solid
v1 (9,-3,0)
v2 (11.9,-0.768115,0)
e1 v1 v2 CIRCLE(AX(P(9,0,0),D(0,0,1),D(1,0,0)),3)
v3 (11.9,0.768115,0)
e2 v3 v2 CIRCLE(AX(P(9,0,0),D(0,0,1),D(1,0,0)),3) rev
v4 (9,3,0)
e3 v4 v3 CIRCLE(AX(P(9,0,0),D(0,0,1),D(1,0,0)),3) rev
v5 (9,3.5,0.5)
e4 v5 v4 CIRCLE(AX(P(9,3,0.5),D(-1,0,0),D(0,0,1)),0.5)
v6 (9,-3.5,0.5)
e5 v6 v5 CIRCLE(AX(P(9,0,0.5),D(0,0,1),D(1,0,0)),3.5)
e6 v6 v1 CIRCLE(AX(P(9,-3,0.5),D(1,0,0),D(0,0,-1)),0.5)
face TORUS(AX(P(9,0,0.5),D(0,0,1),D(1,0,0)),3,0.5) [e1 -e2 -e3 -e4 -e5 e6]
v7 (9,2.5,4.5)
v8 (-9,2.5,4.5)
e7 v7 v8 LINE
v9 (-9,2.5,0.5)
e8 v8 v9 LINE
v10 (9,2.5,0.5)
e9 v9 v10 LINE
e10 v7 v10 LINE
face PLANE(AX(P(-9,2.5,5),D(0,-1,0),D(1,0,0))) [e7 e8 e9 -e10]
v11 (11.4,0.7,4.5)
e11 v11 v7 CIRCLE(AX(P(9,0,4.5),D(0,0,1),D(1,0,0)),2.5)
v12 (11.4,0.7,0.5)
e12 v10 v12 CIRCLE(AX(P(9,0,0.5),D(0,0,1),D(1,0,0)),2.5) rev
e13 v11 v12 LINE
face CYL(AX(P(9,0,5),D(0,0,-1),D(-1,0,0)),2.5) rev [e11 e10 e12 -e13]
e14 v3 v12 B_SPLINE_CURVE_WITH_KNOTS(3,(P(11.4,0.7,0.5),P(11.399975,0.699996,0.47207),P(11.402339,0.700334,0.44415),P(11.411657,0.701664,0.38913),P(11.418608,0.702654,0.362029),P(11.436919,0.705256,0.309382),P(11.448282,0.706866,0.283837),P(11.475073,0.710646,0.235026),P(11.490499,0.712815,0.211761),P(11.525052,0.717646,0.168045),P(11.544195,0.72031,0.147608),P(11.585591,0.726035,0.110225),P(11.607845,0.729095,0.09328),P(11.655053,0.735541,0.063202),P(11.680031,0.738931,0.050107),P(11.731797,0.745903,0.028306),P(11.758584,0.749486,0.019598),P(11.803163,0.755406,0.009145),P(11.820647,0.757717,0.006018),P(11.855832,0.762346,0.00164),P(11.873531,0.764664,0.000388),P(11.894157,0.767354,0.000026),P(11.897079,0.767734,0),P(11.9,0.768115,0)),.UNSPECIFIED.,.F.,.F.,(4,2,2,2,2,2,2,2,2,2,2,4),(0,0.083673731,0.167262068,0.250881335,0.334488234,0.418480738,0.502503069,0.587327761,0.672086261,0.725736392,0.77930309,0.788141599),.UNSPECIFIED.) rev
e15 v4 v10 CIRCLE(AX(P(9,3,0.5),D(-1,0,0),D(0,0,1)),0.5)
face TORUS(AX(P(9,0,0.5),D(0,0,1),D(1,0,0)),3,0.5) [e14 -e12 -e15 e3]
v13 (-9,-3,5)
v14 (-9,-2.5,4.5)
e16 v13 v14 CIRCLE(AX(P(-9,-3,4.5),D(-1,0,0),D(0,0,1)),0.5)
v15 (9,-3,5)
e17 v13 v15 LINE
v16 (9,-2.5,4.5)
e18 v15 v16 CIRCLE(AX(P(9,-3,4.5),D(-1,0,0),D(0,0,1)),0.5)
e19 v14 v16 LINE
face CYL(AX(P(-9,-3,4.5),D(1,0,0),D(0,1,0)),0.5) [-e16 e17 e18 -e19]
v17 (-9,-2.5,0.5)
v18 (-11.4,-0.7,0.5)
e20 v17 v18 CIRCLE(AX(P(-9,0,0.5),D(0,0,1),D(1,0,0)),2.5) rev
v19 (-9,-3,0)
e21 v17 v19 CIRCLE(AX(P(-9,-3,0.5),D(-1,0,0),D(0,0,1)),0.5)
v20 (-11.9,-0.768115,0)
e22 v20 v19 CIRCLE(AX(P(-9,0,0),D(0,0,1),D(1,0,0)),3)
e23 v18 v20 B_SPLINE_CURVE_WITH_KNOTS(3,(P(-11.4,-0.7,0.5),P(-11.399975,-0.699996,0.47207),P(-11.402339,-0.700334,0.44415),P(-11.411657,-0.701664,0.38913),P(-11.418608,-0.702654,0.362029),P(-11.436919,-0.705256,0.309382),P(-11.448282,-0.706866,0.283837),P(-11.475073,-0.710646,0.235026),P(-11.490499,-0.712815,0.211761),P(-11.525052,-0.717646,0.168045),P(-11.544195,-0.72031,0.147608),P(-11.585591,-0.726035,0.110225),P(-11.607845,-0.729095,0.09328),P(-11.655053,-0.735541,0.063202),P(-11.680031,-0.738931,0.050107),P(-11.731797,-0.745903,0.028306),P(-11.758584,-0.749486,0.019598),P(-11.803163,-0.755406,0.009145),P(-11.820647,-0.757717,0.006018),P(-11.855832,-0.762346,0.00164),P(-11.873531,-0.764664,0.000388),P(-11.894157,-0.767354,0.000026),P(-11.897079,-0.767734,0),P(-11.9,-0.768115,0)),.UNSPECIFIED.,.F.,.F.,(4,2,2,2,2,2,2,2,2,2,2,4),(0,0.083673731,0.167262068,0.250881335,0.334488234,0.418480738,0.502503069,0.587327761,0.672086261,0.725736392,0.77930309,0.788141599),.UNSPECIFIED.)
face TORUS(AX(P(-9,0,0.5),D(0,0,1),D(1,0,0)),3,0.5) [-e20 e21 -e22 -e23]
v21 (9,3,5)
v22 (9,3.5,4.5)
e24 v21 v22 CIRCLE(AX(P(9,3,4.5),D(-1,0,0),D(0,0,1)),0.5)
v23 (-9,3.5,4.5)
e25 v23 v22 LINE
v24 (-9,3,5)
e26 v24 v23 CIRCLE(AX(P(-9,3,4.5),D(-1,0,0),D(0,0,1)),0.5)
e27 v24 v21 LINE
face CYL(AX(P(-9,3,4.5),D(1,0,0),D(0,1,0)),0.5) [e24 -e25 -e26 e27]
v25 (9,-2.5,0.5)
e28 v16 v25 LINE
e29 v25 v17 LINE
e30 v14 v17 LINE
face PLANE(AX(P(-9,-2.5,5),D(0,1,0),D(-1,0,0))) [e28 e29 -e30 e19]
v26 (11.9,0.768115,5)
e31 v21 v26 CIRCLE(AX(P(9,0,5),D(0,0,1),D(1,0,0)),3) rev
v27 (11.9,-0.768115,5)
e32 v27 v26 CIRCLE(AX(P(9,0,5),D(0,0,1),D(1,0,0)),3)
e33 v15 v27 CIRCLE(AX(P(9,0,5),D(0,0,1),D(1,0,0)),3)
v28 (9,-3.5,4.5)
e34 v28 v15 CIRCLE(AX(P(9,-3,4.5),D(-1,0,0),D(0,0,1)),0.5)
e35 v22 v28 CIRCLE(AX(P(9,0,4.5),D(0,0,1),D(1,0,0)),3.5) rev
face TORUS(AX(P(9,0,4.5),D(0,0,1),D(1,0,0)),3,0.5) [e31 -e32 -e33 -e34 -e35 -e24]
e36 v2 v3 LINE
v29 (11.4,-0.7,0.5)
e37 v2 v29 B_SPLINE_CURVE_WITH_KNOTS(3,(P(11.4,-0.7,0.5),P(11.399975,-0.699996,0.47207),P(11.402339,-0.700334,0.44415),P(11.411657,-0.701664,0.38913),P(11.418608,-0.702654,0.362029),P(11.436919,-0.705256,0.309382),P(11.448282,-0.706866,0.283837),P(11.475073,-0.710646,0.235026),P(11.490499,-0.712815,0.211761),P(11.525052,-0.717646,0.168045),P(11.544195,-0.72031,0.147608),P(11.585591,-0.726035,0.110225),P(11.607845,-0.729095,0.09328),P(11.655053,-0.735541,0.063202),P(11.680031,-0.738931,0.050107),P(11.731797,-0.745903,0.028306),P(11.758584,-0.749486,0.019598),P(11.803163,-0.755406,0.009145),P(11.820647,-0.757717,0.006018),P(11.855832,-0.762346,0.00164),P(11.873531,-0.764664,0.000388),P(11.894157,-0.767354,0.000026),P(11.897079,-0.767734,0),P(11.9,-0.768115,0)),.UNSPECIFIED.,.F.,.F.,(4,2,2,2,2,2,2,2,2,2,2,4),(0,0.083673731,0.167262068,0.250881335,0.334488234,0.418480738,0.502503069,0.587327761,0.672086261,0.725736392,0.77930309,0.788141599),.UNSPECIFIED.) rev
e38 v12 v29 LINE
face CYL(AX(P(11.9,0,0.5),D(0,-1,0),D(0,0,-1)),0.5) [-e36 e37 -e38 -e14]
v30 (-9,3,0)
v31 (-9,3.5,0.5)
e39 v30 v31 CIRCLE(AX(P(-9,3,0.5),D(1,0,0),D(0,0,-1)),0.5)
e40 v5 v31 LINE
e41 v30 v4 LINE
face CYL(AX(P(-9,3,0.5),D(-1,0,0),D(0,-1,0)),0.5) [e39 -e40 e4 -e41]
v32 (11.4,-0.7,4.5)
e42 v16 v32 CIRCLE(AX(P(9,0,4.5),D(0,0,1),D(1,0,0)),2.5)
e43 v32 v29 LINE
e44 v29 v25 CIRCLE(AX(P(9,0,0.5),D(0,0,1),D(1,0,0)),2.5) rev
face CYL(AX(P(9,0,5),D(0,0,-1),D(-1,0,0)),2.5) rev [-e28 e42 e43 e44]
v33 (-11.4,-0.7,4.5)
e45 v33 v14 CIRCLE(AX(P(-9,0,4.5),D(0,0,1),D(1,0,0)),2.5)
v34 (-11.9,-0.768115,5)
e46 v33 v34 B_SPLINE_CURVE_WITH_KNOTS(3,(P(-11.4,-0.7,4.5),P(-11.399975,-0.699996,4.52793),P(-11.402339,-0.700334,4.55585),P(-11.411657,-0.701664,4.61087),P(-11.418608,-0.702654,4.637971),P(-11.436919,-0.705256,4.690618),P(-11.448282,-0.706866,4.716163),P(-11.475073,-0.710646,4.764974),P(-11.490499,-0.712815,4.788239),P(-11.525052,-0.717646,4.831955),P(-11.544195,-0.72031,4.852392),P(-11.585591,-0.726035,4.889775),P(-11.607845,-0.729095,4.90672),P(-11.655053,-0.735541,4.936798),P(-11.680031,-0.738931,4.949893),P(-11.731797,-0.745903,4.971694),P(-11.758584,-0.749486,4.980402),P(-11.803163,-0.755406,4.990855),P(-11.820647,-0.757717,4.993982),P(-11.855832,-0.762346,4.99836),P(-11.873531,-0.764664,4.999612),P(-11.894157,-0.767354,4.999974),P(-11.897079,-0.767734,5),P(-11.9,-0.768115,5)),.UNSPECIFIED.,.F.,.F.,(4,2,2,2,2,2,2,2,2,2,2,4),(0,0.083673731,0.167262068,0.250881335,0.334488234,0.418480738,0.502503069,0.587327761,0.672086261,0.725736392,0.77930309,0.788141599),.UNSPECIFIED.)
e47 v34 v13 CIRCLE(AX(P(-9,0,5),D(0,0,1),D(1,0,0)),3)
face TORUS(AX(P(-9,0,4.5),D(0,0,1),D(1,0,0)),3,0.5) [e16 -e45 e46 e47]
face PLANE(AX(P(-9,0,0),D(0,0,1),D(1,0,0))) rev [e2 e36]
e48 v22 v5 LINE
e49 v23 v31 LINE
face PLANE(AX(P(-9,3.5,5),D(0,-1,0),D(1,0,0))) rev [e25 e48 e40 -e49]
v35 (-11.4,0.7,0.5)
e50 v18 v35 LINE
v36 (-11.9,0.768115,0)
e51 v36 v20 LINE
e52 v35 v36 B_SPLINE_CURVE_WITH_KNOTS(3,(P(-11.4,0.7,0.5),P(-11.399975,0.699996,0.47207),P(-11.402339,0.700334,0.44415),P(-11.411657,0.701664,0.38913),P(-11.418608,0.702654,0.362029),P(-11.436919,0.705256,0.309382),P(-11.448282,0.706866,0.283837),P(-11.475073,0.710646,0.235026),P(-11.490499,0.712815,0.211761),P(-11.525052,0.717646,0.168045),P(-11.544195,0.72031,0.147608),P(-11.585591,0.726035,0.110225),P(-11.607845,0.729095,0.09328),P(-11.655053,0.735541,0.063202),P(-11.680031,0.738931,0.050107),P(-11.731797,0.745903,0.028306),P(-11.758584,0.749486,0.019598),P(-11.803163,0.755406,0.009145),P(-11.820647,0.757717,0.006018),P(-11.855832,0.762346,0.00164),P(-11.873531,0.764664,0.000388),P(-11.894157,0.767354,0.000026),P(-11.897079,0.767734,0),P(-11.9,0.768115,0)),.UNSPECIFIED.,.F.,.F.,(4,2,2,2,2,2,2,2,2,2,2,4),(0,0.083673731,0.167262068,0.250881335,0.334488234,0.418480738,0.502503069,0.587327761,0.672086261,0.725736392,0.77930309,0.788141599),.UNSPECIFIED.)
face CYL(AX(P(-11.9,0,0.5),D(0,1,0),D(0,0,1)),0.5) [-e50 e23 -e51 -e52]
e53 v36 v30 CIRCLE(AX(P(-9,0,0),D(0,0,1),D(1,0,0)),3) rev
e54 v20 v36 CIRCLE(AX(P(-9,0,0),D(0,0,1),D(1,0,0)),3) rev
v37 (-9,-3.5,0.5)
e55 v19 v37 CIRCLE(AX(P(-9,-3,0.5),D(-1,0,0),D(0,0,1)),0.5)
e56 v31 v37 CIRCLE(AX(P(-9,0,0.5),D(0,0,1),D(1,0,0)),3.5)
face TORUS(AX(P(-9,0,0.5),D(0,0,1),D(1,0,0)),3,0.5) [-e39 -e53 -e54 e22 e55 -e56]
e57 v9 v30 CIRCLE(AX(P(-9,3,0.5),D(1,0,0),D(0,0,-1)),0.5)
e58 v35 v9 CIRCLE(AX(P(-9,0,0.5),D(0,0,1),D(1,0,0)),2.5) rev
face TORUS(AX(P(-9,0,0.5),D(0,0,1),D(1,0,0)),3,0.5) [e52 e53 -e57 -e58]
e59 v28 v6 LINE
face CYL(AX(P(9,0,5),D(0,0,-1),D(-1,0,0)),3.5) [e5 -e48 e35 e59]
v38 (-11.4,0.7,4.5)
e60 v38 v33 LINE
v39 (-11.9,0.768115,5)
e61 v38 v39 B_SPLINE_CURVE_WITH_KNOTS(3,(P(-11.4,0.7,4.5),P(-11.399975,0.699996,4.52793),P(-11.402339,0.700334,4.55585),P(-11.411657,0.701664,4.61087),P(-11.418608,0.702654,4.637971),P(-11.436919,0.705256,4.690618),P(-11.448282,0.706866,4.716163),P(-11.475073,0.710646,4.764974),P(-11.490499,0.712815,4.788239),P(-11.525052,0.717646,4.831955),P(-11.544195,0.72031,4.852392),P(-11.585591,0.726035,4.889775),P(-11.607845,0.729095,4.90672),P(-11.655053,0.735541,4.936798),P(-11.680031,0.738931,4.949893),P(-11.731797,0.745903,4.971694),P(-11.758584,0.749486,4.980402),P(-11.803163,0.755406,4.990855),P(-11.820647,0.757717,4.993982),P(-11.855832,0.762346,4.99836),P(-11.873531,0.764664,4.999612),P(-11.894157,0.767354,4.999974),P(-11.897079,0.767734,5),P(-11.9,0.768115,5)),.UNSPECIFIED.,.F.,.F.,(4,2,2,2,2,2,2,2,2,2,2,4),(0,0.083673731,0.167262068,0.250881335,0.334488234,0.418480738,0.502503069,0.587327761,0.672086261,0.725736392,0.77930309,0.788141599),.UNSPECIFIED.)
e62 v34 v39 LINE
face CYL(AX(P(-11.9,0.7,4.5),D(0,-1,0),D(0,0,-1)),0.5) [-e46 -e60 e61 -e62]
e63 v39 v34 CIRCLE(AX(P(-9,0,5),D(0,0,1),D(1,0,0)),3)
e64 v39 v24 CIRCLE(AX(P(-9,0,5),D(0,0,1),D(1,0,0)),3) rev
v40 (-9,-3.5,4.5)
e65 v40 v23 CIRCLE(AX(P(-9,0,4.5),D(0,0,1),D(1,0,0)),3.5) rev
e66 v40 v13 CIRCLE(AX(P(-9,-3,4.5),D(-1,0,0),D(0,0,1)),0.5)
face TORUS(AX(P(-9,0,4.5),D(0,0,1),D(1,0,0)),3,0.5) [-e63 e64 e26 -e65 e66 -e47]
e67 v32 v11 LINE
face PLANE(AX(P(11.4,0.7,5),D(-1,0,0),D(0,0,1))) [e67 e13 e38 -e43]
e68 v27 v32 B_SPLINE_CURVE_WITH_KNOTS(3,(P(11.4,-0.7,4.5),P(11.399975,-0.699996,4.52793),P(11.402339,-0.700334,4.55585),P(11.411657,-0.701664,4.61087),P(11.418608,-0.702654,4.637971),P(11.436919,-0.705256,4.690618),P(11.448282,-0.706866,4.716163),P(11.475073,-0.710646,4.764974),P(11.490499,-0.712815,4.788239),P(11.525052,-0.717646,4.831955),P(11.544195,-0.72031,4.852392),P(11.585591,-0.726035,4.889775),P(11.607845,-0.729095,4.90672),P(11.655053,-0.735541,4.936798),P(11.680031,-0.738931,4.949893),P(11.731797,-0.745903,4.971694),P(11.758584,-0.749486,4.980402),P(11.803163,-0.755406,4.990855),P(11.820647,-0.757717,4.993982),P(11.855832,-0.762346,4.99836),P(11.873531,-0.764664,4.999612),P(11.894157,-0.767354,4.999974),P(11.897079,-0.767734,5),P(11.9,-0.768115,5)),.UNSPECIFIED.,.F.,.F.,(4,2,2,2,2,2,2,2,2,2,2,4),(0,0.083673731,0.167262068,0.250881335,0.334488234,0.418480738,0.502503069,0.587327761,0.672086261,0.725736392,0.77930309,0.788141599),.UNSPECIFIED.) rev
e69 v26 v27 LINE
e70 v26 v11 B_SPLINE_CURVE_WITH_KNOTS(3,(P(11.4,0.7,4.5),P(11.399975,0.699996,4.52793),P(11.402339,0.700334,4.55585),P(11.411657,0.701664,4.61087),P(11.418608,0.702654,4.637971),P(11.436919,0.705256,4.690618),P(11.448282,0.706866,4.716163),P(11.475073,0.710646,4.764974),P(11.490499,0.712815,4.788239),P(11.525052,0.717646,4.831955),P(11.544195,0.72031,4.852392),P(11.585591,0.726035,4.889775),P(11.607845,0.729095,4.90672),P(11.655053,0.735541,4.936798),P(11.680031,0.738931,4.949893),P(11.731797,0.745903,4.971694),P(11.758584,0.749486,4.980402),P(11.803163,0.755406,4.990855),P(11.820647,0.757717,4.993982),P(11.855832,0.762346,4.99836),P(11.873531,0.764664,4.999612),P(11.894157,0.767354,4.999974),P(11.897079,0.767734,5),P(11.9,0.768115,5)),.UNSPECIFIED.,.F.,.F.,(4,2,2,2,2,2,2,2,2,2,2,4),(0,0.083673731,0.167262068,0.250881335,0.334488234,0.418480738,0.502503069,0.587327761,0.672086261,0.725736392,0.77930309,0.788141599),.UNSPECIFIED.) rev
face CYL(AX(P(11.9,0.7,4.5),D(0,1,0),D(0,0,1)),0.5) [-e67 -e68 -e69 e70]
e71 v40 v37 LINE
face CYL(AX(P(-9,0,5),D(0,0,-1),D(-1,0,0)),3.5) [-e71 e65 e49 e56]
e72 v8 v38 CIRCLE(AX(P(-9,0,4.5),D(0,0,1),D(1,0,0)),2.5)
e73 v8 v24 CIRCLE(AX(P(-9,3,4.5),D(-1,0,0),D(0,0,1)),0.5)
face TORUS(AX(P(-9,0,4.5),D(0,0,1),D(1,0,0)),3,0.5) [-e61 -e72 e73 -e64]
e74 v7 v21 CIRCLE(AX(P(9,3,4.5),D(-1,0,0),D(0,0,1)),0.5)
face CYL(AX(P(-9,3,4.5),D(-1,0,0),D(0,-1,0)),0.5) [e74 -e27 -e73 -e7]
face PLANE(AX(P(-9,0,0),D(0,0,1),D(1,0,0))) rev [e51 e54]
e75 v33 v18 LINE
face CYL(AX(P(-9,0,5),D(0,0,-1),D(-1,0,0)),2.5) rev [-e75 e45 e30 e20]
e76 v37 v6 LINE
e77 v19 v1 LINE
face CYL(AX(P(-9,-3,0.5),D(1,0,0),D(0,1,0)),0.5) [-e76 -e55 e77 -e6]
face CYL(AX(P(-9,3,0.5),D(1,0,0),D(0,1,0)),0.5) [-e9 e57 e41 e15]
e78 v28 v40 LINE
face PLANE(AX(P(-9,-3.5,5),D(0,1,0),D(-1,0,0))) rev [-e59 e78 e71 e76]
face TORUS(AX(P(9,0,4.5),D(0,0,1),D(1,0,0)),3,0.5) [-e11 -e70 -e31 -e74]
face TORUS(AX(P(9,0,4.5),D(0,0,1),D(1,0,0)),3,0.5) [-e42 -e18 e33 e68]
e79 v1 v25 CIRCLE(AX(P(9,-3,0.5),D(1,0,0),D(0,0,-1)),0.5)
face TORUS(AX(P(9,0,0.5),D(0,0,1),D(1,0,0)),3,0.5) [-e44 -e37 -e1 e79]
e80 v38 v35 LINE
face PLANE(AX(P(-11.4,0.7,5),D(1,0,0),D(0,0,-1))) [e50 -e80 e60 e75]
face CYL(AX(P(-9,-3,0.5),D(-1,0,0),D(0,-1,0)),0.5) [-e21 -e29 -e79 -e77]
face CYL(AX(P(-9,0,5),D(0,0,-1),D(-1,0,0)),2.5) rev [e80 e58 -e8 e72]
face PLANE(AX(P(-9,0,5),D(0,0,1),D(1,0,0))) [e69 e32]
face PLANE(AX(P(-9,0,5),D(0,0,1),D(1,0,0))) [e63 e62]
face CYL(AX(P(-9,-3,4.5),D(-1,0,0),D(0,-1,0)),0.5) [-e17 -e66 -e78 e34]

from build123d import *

# Parameters (mm, degrees)
BOSS_EXTRUDE1_DEPTH = 5
FILLET1_R           = 0.5


with BuildPart() as part:
    # Sketch1 → Boss-Extrude1 (new body)
    with BuildSketch(Plane.XY):
        with BuildLine():
            Line((-9, 3.5), (9, 3.5))
            ThreePointArc((9, 3.5), (12.5, 0), (9, -3.5))
            Line((9, -3.5), (-9, -3.5))
            ThreePointArc((-9, -3.5), (-12.5, 0), (-9, 3.5))
        make_face()
        with BuildLine():
            Line((-9, 2.5), (9, 2.5))
            ThreePointArc((9, 2.5), (10.5, 2), (11.4, 0.7))
            Line((11.4, 0.7), (11.4, -0.7))
            ThreePointArc((11.4, -0.7), (10.5, -2), (9, -2.5))
            Line((9, -2.5), (-9, -2.5))
            ThreePointArc((-9, -2.5), (-10.5, -2), (-11.4, -0.7))
            Line((-11.4, -0.7), (-11.4, 0.7))
            ThreePointArc((-11.4, 0.7), (-10.5, 2), (-9, 2.5))
        make_face(mode=Mode.SUBTRACT)
    extrude(amount=BOSS_EXTRUDE1_DEPTH)

    # Fillet1
    # the kernel refuses this fillet: 0.5 mm, written as the material it takes off along each edge
    with BuildSketch(Plane(origin=(9, 0, 5), x_dir=(0, 1, 0), z_dir=(-1, 0, 0))) as fillet1_piece_1:
        with BuildLine():
            CenterArc((3.5 - FILLET1_R, FILLET1_R), FILLET1_R, 270, 90)
            Line((3.5 - FILLET1_R, 0), (3.5, 0))
            Line((3.5, 0), (3.5, FILLET1_R))
        make_face()
    revolve(axis=Axis((9, 0, 5), (0, 0, -1)), revolution_arc=180, mode=Mode.SUBTRACT)
    with BuildSketch(Plane(origin=(-9, 3.5, 5), x_dir=(0, 0, -1), z_dir=(1, 0, 0)), Plane(origin=(9, -2.5, 0), x_dir=(0, 0, 1), z_dir=(-1, 0, 0)), Plane(origin=(-9, 2.5, 0), x_dir=(0, 0, 1), z_dir=(1, 0, 0)), Plane(origin=(9, -3.5, 5), x_dir=(0, 0, -1), z_dir=(-1, 0, 0))) as fillet1_piece_2:
        with BuildLine():
            CenterArc((FILLET1_R, -FILLET1_R), FILLET1_R, 90, 90)
            Line((0, -FILLET1_R), (0, 0))
            Line((0, 0), (FILLET1_R, 0))
        make_face()
    extrude(amount=18, mode=Mode.SUBTRACT)
    with BuildSketch(Plane(origin=(-9, 0, 0), x_dir=(-0.9766894786978908, -0.21465708048150275, 0), z_dir=(0.21465708048150275, -0.9766894786978908, 0))) as fillet1_piece_3_section:
        with BuildLine():
            CenterArc((2.5 + FILLET1_R, -FILLET1_R), FILLET1_R, 90, 90)
            Line((2.5 + FILLET1_R, 0), (2.5, 0))
            Line((2.5, 0), (2.5, -FILLET1_R))
        make_face()
    fillet1_piece_3 = revolve(axis=Axis((-9, 0, 0), (0, 0, -1)), revolution_arc=102.395409755, mode=Mode.PRIVATE)
    fillet1_piece_3 = split(fillet1_piece_3, bisect_by=Plane(origin=(-11.4, 2.113874097, 0.142342621), z_dir=(1, 0, 0)), keep=Keep.TOP, mode=Mode.PRIVATE)
    add(fillet1_piece_3, mode=Mode.SUBTRACT)
    with BuildSketch(Plane(origin=(-11.4, -1.95, 0), x_dir=(0, 0, 1), z_dir=(0, 1, 0))) as fillet1_piece_4_section:
        with BuildLine():
            CenterArc((FILLET1_R, -FILLET1_R), FILLET1_R, 90, 90)
            Line((0, -FILLET1_R), (0, 0))
            Line((0, 0), (FILLET1_R, 0))
        make_face()
    fillet1_piece_4 = extrude(amount=3.9, mode=Mode.PRIVATE)
    fillet1_piece_4 = fillet1_piece_4 & Plane(origin=(-9, 0, 0.177440654), x_dir=(-0.9599999999999995, 0.2800000000000019, 0), z_dir=(0, 0, -1)) * Cylinder(2.5, 10, mode=Mode.PRIVATE)
    add(fillet1_piece_4, mode=Mode.SUBTRACT)
    with BuildSketch(Plane(origin=(-9, 0, 0), x_dir=(0, -1, 0), z_dir=(1, 0, 0))) as fillet1_piece_5_section:
        with BuildLine():
            CenterArc((2.5 + FILLET1_R, -FILLET1_R), FILLET1_R, 90, 90)
            Line((2.5 + FILLET1_R, 0), (2.5, 0))
            Line((2.5, 0), (2.5, -FILLET1_R))
        make_face()
    fillet1_piece_5 = revolve(axis=Axis((-9, 0, 0), (0, 0, -1)), revolution_arc=102.395409755, mode=Mode.PRIVATE)
    fillet1_piece_5 = split(fillet1_piece_5, bisect_by=Plane(origin=(-11.4, -2.113874096, 0.14234262), z_dir=(1, 0, 0)), keep=Keep.TOP, mode=Mode.PRIVATE)
    add(fillet1_piece_5, mode=Mode.SUBTRACT)
    with BuildSketch(Plane(origin=(9, 0, 0), x_dir=(0.9766894786978914, 0.21465708048149984, 0), z_dir=(-0.21465708048149984, 0.9766894786978914, 0))) as fillet1_piece_6_section:
        with BuildLine():
            CenterArc((2.5 + FILLET1_R, -FILLET1_R), FILLET1_R, 90, 90)
            Line((2.5 + FILLET1_R, 0), (2.5, 0))
            Line((2.5, 0), (2.5, -FILLET1_R))
        make_face()
    fillet1_piece_6 = revolve(axis=Axis((9, 0, 0), (0, 0, -1)), revolution_arc=102.395409755, mode=Mode.PRIVATE)
    fillet1_piece_6 = split(fillet1_piece_6, bisect_by=Plane(origin=(11.4, -2.113874097, 0.142342621), z_dir=(-1, 0, 0)), keep=Keep.TOP, mode=Mode.PRIVATE)
    add(fillet1_piece_6, mode=Mode.SUBTRACT)
    with BuildSketch(Plane(origin=(11.4, 1.95, 0), x_dir=(0, 0, 1), z_dir=(0, -1, 0))) as fillet1_piece_7_section:
        with BuildLine():
            CenterArc((FILLET1_R, -FILLET1_R), FILLET1_R, 90, 90)
            Line((0, -FILLET1_R), (0, 0))
            Line((0, 0), (FILLET1_R, 0))
        make_face()
    fillet1_piece_7 = extrude(amount=3.9, mode=Mode.PRIVATE)
    fillet1_piece_7 = fillet1_piece_7 & Plane(origin=(9, 0, 0.177440654), x_dir=(0.9599999999999989, -0.2800000000000039, 0), z_dir=(0, 0, -1)) * Cylinder(2.5, 10, mode=Mode.PRIVATE)
    add(fillet1_piece_7, mode=Mode.SUBTRACT)
    with BuildSketch(Plane(origin=(9, 0, 0), x_dir=(0, 1, 0), z_dir=(-1, 0, 0))) as fillet1_piece_8_section:
        with BuildLine():
            CenterArc((2.5 + FILLET1_R, -FILLET1_R), FILLET1_R, 90, 90)
            Line((2.5 + FILLET1_R, 0), (2.5, 0))
            Line((2.5, 0), (2.5, -FILLET1_R))
        make_face()
    fillet1_piece_8 = revolve(axis=Axis((9, 0, 0), (0, 0, -1)), revolution_arc=102.395409755, mode=Mode.PRIVATE)
    fillet1_piece_8 = split(fillet1_piece_8, bisect_by=Plane(origin=(11.4, 2.113874096, 0.14234262), z_dir=(-1, 0, 0)), keep=Keep.TOP, mode=Mode.PRIVATE)
    add(fillet1_piece_8, mode=Mode.SUBTRACT)
    with BuildSketch(Plane(origin=(-9, 0, 5), x_dir=(-0.9766894786978908, -0.21465708048150275, 0), z_dir=(0.21465708048150275, -0.9766894786978908, 0))) as fillet1_piece_9_section:
        with BuildLine():
            CenterArc((2.5 + FILLET1_R, FILLET1_R), FILLET1_R, 180, 90)
            Line((2.5 + FILLET1_R, 0), (2.5, 0))
            Line((2.5, 0), (2.5, FILLET1_R))
        make_face()
    fillet1_piece_9 = revolve(axis=Axis((-9, 0, 5), (0, 0, -1)), revolution_arc=102.395409755, mode=Mode.PRIVATE)
    fillet1_piece_9 = split(fillet1_piece_9, bisect_by=Plane(origin=(-11.4, 2.113874097, 4.857657379), z_dir=(1, 0, 0)), keep=Keep.TOP, mode=Mode.PRIVATE)
    add(fillet1_piece_9, mode=Mode.SUBTRACT)
    with BuildSketch(Plane(origin=(-11.4, -1.95, 5), x_dir=(0, 0, -1), z_dir=(0, 1, 0))) as fillet1_piece_10_section:
        with BuildLine():
            CenterArc((FILLET1_R, FILLET1_R), FILLET1_R, 180, 90)
            Line((0, FILLET1_R), (0, 0))
            Line((0, 0), (FILLET1_R, 0))
        make_face()
    fillet1_piece_10 = extrude(amount=3.9, mode=Mode.PRIVATE)
    fillet1_piece_10 = fillet1_piece_10 & Plane(origin=(-9, 0, 4.822559346), x_dir=(-0.9599999999999995, 0.2800000000000019, 0), z_dir=(0, 0, -1)) * Cylinder(2.5, 10, mode=Mode.PRIVATE)
    add(fillet1_piece_10, mode=Mode.SUBTRACT)
    with BuildSketch(Plane(origin=(-9, 0, 5), x_dir=(0, -1, 0), z_dir=(1, 0, 0))) as fillet1_piece_11_section:
        with BuildLine():
            CenterArc((2.5 + FILLET1_R, FILLET1_R), FILLET1_R, 180, 90)
            Line((2.5 + FILLET1_R, 0), (2.5, 0))
            Line((2.5, 0), (2.5, FILLET1_R))
        make_face()
    fillet1_piece_11 = revolve(axis=Axis((-9, 0, 5), (0, 0, -1)), revolution_arc=102.395409755, mode=Mode.PRIVATE)
    fillet1_piece_11 = split(fillet1_piece_11, bisect_by=Plane(origin=(-11.4, -2.113874096, 4.85765738), z_dir=(1, 0, 0)), keep=Keep.TOP, mode=Mode.PRIVATE)
    add(fillet1_piece_11, mode=Mode.SUBTRACT)
    with BuildSketch(Plane(origin=(9, -2.5, 5), x_dir=(0, 0, -1), z_dir=(-1, 0, 0)), Plane(origin=(-9, 2.5, 5), x_dir=(0, 0, -1), z_dir=(1, 0, 0)), Plane(origin=(-9, 3.5, 0), x_dir=(0, 0, 1), z_dir=(1, 0, 0)), Plane(origin=(9, -3.5, 0), x_dir=(0, 0, 1), z_dir=(-1, 0, 0))) as fillet1_piece_12:
        with BuildLine():
            CenterArc((FILLET1_R, FILLET1_R), FILLET1_R, 180, 90)
            Line((0, FILLET1_R), (0, 0))
            Line((0, 0), (FILLET1_R, 0))
        make_face()
    extrude(amount=18, mode=Mode.SUBTRACT)
    with BuildSketch(Plane(origin=(9, 0, 5), x_dir=(0.9766894786978914, 0.21465708048150012, 0), z_dir=(-0.21465708048150012, 0.9766894786978914, 0))) as fillet1_piece_13_section:
        with BuildLine():
            CenterArc((2.5 + FILLET1_R, FILLET1_R), FILLET1_R, 180, 90)
            Line((2.5 + FILLET1_R, 0), (2.5, 0))
            Line((2.5, 0), (2.5, FILLET1_R))
        make_face()
    fillet1_piece_13 = revolve(axis=Axis((9, 0, 5), (0, 0, -1)), revolution_arc=102.395409755, mode=Mode.PRIVATE)
    fillet1_piece_13 = split(fillet1_piece_13, bisect_by=Plane(origin=(11.4, -2.113874097, 4.857657379), z_dir=(-1, 0, 0)), keep=Keep.TOP, mode=Mode.PRIVATE)
    add(fillet1_piece_13, mode=Mode.SUBTRACT)
    with BuildSketch(Plane(origin=(11.4, 1.95, 5), x_dir=(0, 0, -1), z_dir=(0, -1, 0))) as fillet1_piece_14_section:
        with BuildLine():
            CenterArc((FILLET1_R, FILLET1_R), FILLET1_R, 180, 90)
            Line((0, FILLET1_R), (0, 0))
            Line((0, 0), (FILLET1_R, 0))
        make_face()
    fillet1_piece_14 = extrude(amount=3.9, mode=Mode.PRIVATE)
    fillet1_piece_14 = fillet1_piece_14 & Plane(origin=(9, 0, 4.822559346), x_dir=(0.9599999999999989, -0.2800000000000039, 0), z_dir=(0, 0, -1)) * Cylinder(2.5, 10, mode=Mode.PRIVATE)
    add(fillet1_piece_14, mode=Mode.SUBTRACT)
    with BuildSketch(Plane(origin=(9, 0, 5), x_dir=(0, 1, 0), z_dir=(-1, 0, 0))) as fillet1_piece_15_section:
        with BuildLine():
            CenterArc((2.5 + FILLET1_R, FILLET1_R), FILLET1_R, 180, 90)
            Line((2.5 + FILLET1_R, 0), (2.5, 0))
            Line((2.5, 0), (2.5, FILLET1_R))
        make_face()
    fillet1_piece_15 = revolve(axis=Axis((9, 0, 5), (0, 0, -1)), revolution_arc=102.395409755, mode=Mode.PRIVATE)
    fillet1_piece_15 = split(fillet1_piece_15, bisect_by=Plane(origin=(11.4, 2.113874096, 4.85765738), z_dir=(-1, 0, 0)), keep=Keep.TOP, mode=Mode.PRIVATE)
    add(fillet1_piece_15, mode=Mode.SUBTRACT)
    with BuildSketch(Plane(origin=(-9, 0, 5), x_dir=(0, -1, 0), z_dir=(1, 0, 0))) as fillet1_piece_16:
        with BuildLine():
            CenterArc((3.5 - FILLET1_R, FILLET1_R), FILLET1_R, 270, 90)
            Line((3.5 - FILLET1_R, 0), (3.5, 0))
            Line((3.5, 0), (3.5, FILLET1_R))
        make_face()
    revolve(axis=Axis((-9, 0, 5), (0, 0, -1)), revolution_arc=180, mode=Mode.SUBTRACT)
    with BuildSketch(Plane(origin=(9, 0, 0), x_dir=(0, 1, 0), z_dir=(-1, 0, 0))) as fillet1_piece_17:
        with BuildLine():
            CenterArc((3.5 - FILLET1_R, -FILLET1_R), FILLET1_R, 0, 90)
            Line((3.5 - FILLET1_R, 0), (3.5, 0))
            Line((3.5, 0), (3.5, -FILLET1_R))
        make_face()
    revolve(axis=Axis((9, 0, 0), (0, 0, -1)), revolution_arc=180, mode=Mode.SUBTRACT)
    with BuildSketch(Plane(origin=(-9, 0, 0), x_dir=(0, -1, 0), z_dir=(1, 0, 0))) as fillet1_piece_18:
        with BuildLine():
            CenterArc((3.5 - FILLET1_R, -FILLET1_R), FILLET1_R, 0, 90)
            Line((3.5 - FILLET1_R, 0), (3.5, 0))
            Line((3.5, 0), (3.5, -FILLET1_R))
        make_face()
    revolve(axis=Axis((-9, 0, 0), (0, 0, -1)), revolution_arc=180, mode=Mode.SUBTRACT)
    with BuildSketch(Plane(origin=(-9, 0, 0), x_dir=(-0.9766894786978908, -0.21465708048150275, 0), z_dir=(0.21465708048150275, -0.9766894786978908, 0))) as fillet1_piece_19a_section:
        with BuildLine():
            CenterArc((2.5 + FILLET1_R, -FILLET1_R), FILLET1_R, 90, 90)
            Line((2.5 + FILLET1_R, 0), (2.5, 0))
            Line((2.5, 0), (2.5, -FILLET1_R))
        make_face()
    fillet1_piece_19a = revolve(axis=Axis((-9, 0, 0), (0, 0, -1)), revolution_arc=102.395409755, mode=Mode.PRIVATE)
    fillet1_piece_19a = split(fillet1_piece_19a, bisect_by=Plane(origin=(-11.4, 0.255268882, 0.100667664), z_dir=(-1, 0, 0)), keep=Keep.TOP, mode=Mode.PRIVATE)
    with BuildSketch(Plane(origin=(-11.4, -1.95, 0), x_dir=(0, 0, 1), z_dir=(0, 1, 0))) as fillet1_piece_19b_section:
        with BuildLine():
            CenterArc((FILLET1_R, -FILLET1_R), FILLET1_R, 90, 90)
            Line((0, -FILLET1_R), (0, 0))
            Line((0, 0), (FILLET1_R, 0))
        make_face()
    fillet1_piece_19b = extrude(amount=3.9, mode=Mode.PRIVATE)
    fillet1_piece_19b = fillet1_piece_19b - Plane(origin=(-9, 0, 0.101579773), x_dir=(-0.9599999999999995, 0.2800000000000019, 0), z_dir=(0, 0, -1)) * Cylinder(2.5, 10, mode=Mode.PRIVATE)
    fillet1_piece_19 = fillet1_piece_19a & fillet1_piece_19b
    add(fillet1_piece_19, mode=Mode.SUBTRACT)
    with BuildSketch(Plane(origin=(-11.4, -1.95, 0), x_dir=(0, 0, 1), z_dir=(0, 1, 0))) as fillet1_piece_20a_section:
        with BuildLine():
            CenterArc((FILLET1_R, -FILLET1_R), FILLET1_R, 90, 90)
            Line((0, -FILLET1_R), (0, 0))
            Line((0, 0), (FILLET1_R, 0))
        make_face()
    fillet1_piece_20a = extrude(amount=3.9, mode=Mode.PRIVATE)
    fillet1_piece_20a = fillet1_piece_20a - Plane(origin=(-9, 0, 0.101579773), x_dir=(-0.9599999999999995, 0.2800000000000019, 0), z_dir=(0, 0, -1)) * Cylinder(2.5, 10, mode=Mode.PRIVATE)
    with BuildSketch(Plane(origin=(-9, 0, 0), x_dir=(0, -1, 0), z_dir=(1, 0, 0))) as fillet1_piece_20b_section:
        with BuildLine():
            CenterArc((2.5 + FILLET1_R, -FILLET1_R), FILLET1_R, 90, 90)
            Line((2.5 + FILLET1_R, 0), (2.5, 0))
            Line((2.5, 0), (2.5, -FILLET1_R))
        make_face()
    fillet1_piece_20b = revolve(axis=Axis((-9, 0, 0), (0, 0, -1)), revolution_arc=102.395409755, mode=Mode.PRIVATE)
    fillet1_piece_20b = split(fillet1_piece_20b, bisect_by=Plane(origin=(-11.4, -0.255267344, 0.10066773), z_dir=(-1, 0, 0)), keep=Keep.TOP, mode=Mode.PRIVATE)
    fillet1_piece_20 = fillet1_piece_20a & fillet1_piece_20b
    add(fillet1_piece_20, mode=Mode.SUBTRACT)
    with BuildSketch(Plane(origin=(9, 0, 0), x_dir=(0.9766894786978914, 0.21465708048149984, 0), z_dir=(-0.21465708048149984, 0.9766894786978914, 0))) as fillet1_piece_21a_section:
        with BuildLine():
            CenterArc((2.5 + FILLET1_R, -FILLET1_R), FILLET1_R, 90, 90)
            Line((2.5 + FILLET1_R, 0), (2.5, 0))
            Line((2.5, 0), (2.5, -FILLET1_R))
        make_face()
    fillet1_piece_21a = revolve(axis=Axis((9, 0, 0), (0, 0, -1)), revolution_arc=102.395409755, mode=Mode.PRIVATE)
    fillet1_piece_21a = split(fillet1_piece_21a, bisect_by=Plane(origin=(11.4, -0.255268882, 0.100667664), z_dir=(1, 0, 0)), keep=Keep.TOP, mode=Mode.PRIVATE)
    with BuildSketch(Plane(origin=(11.4, 1.95, 0), x_dir=(0, 0, 1), z_dir=(0, -1, 0))) as fillet1_piece_21b_section:
        with BuildLine():
            CenterArc((FILLET1_R, -FILLET1_R), FILLET1_R, 90, 90)
            Line((0, -FILLET1_R), (0, 0))
            Line((0, 0), (FILLET1_R, 0))
        make_face()
    fillet1_piece_21b = extrude(amount=3.9, mode=Mode.PRIVATE)
    fillet1_piece_21b = fillet1_piece_21b - Plane(origin=(9, 0, 0.101579773), x_dir=(0.9599999999999989, -0.2800000000000039, 0), z_dir=(0, 0, -1)) * Cylinder(2.5, 10, mode=Mode.PRIVATE)
    fillet1_piece_21 = fillet1_piece_21a & fillet1_piece_21b
    add(fillet1_piece_21, mode=Mode.SUBTRACT)
    with BuildSketch(Plane(origin=(11.4, 1.95, 0), x_dir=(0, 0, 1), z_dir=(0, -1, 0))) as fillet1_piece_22a_section:
        with BuildLine():
            CenterArc((FILLET1_R, -FILLET1_R), FILLET1_R, 90, 90)
            Line((0, -FILLET1_R), (0, 0))
            Line((0, 0), (FILLET1_R, 0))
        make_face()
    fillet1_piece_22a = extrude(amount=3.9, mode=Mode.PRIVATE)
    fillet1_piece_22a = fillet1_piece_22a - Plane(origin=(9, 0, 0.101579773), x_dir=(0.9599999999999989, -0.2800000000000039, 0), z_dir=(0, 0, -1)) * Cylinder(2.5, 10, mode=Mode.PRIVATE)
    with BuildSketch(Plane(origin=(9, 0, 0), x_dir=(0, 1, 0), z_dir=(-1, 0, 0))) as fillet1_piece_22b_section:
        with BuildLine():
            CenterArc((2.5 + FILLET1_R, -FILLET1_R), FILLET1_R, 90, 90)
            Line((2.5 + FILLET1_R, 0), (2.5, 0))
            Line((2.5, 0), (2.5, -FILLET1_R))
        make_face()
    fillet1_piece_22b = revolve(axis=Axis((9, 0, 0), (0, 0, -1)), revolution_arc=102.395409755, mode=Mode.PRIVATE)
    fillet1_piece_22b = split(fillet1_piece_22b, bisect_by=Plane(origin=(11.4, 0.255267344, 0.10066773), z_dir=(1, 0, 0)), keep=Keep.TOP, mode=Mode.PRIVATE)
    fillet1_piece_22 = fillet1_piece_22a & fillet1_piece_22b
    add(fillet1_piece_22, mode=Mode.SUBTRACT)
    with BuildSketch(Plane(origin=(-9, 0, 5), x_dir=(-0.9766894786978908, -0.21465708048150275, 0), z_dir=(0.21465708048150275, -0.9766894786978908, 0))) as fillet1_piece_23a_section:
        with BuildLine():
            CenterArc((2.5 + FILLET1_R, FILLET1_R), FILLET1_R, 180, 90)
            Line((2.5 + FILLET1_R, 0), (2.5, 0))
            Line((2.5, 0), (2.5, FILLET1_R))
        make_face()
    fillet1_piece_23a = revolve(axis=Axis((-9, 0, 5), (0, 0, -1)), revolution_arc=102.395409755, mode=Mode.PRIVATE)
    fillet1_piece_23a = split(fillet1_piece_23a, bisect_by=Plane(origin=(-11.4, 0.255268882, 4.899332336), z_dir=(-1, 0, 0)), keep=Keep.TOP, mode=Mode.PRIVATE)
    with BuildSketch(Plane(origin=(-11.4, -1.95, 5), x_dir=(0, 0, -1), z_dir=(0, 1, 0))) as fillet1_piece_23b_section:
        with BuildLine():
            CenterArc((FILLET1_R, FILLET1_R), FILLET1_R, 180, 90)
            Line((0, FILLET1_R), (0, 0))
            Line((0, 0), (FILLET1_R, 0))
        make_face()
    fillet1_piece_23b = extrude(amount=3.9, mode=Mode.PRIVATE)
    fillet1_piece_23b = fillet1_piece_23b - Plane(origin=(-9, 0, 4.898420227), x_dir=(-0.9599999999999995, 0.2800000000000019, 0), z_dir=(0, 0, -1)) * Cylinder(2.5, 10, mode=Mode.PRIVATE)
    fillet1_piece_23 = fillet1_piece_23a & fillet1_piece_23b
    add(fillet1_piece_23, mode=Mode.SUBTRACT)
    with BuildSketch(Plane(origin=(-11.4, -1.95, 5), x_dir=(0, 0, -1), z_dir=(0, 1, 0))) as fillet1_piece_24a_section:
        with BuildLine():
            CenterArc((FILLET1_R, FILLET1_R), FILLET1_R, 180, 90)
            Line((0, FILLET1_R), (0, 0))
            Line((0, 0), (FILLET1_R, 0))
        make_face()
    fillet1_piece_24a = extrude(amount=3.9, mode=Mode.PRIVATE)
    fillet1_piece_24a = fillet1_piece_24a - Plane(origin=(-9, 0, 4.898420227), x_dir=(-0.9599999999999995, 0.2800000000000019, 0), z_dir=(0, 0, -1)) * Cylinder(2.5, 10, mode=Mode.PRIVATE)
    with BuildSketch(Plane(origin=(-9, 0, 5), x_dir=(0, -1, 0), z_dir=(1, 0, 0))) as fillet1_piece_24b_section:
        with BuildLine():
            CenterArc((2.5 + FILLET1_R, FILLET1_R), FILLET1_R, 180, 90)
            Line((2.5 + FILLET1_R, 0), (2.5, 0))
            Line((2.5, 0), (2.5, FILLET1_R))
        make_face()
    fillet1_piece_24b = revolve(axis=Axis((-9, 0, 5), (0, 0, -1)), revolution_arc=102.395409755, mode=Mode.PRIVATE)
    fillet1_piece_24b = split(fillet1_piece_24b, bisect_by=Plane(origin=(-11.4, -0.255267344, 4.89933227), z_dir=(-1, 0, 0)), keep=Keep.TOP, mode=Mode.PRIVATE)
    fillet1_piece_24 = fillet1_piece_24a & fillet1_piece_24b
    add(fillet1_piece_24, mode=Mode.SUBTRACT)
    with BuildSketch(Plane(origin=(9, 0, 5), x_dir=(0.9766894786978914, 0.21465708048150012, 0), z_dir=(-0.21465708048150012, 0.9766894786978914, 0))) as fillet1_piece_25a_section:
        with BuildLine():
            CenterArc((2.5 + FILLET1_R, FILLET1_R), FILLET1_R, 180, 90)
            Line((2.5 + FILLET1_R, 0), (2.5, 0))
            Line((2.5, 0), (2.5, FILLET1_R))
        make_face()
    fillet1_piece_25a = revolve(axis=Axis((9, 0, 5), (0, 0, -1)), revolution_arc=102.395409755, mode=Mode.PRIVATE)
    fillet1_piece_25a = split(fillet1_piece_25a, bisect_by=Plane(origin=(11.4, -0.255268882, 4.899332336), z_dir=(1, 0, 0)), keep=Keep.TOP, mode=Mode.PRIVATE)
    with BuildSketch(Plane(origin=(11.4, 1.95, 5), x_dir=(0, 0, -1), z_dir=(0, -1, 0))) as fillet1_piece_25b_section:
        with BuildLine():
            CenterArc((FILLET1_R, FILLET1_R), FILLET1_R, 180, 90)
            Line((0, FILLET1_R), (0, 0))
            Line((0, 0), (FILLET1_R, 0))
        make_face()
    fillet1_piece_25b = extrude(amount=3.9, mode=Mode.PRIVATE)
    fillet1_piece_25b = fillet1_piece_25b - Plane(origin=(9, 0, 4.898420227), x_dir=(0.9599999999999989, -0.2800000000000039, 0), z_dir=(0, 0, -1)) * Cylinder(2.5, 10, mode=Mode.PRIVATE)
    fillet1_piece_25 = fillet1_piece_25a & fillet1_piece_25b
    add(fillet1_piece_25, mode=Mode.SUBTRACT)
    with BuildSketch(Plane(origin=(11.4, 1.95, 5), x_dir=(0, 0, -1), z_dir=(0, -1, 0))) as fillet1_piece_26a_section:
        with BuildLine():
            CenterArc((FILLET1_R, FILLET1_R), FILLET1_R, 180, 90)
            Line((0, FILLET1_R), (0, 0))
            Line((0, 0), (FILLET1_R, 0))
        make_face()
    fillet1_piece_26a = extrude(amount=3.9, mode=Mode.PRIVATE)
    fillet1_piece_26a = fillet1_piece_26a - Plane(origin=(9, 0, 4.898420227), x_dir=(0.9599999999999989, -0.2800000000000039, 0), z_dir=(0, 0, -1)) * Cylinder(2.5, 10, mode=Mode.PRIVATE)
    with BuildSketch(Plane(origin=(9, 0, 5), x_dir=(0, 1, 0), z_dir=(-1, 0, 0))) as fillet1_piece_26b_section:
        with BuildLine():
            CenterArc((2.5 + FILLET1_R, FILLET1_R), FILLET1_R, 180, 90)
            Line((2.5 + FILLET1_R, 0), (2.5, 0))
            Line((2.5, 0), (2.5, FILLET1_R))
        make_face()
    fillet1_piece_26b = revolve(axis=Axis((9, 0, 5), (0, 0, -1)), revolution_arc=102.395409755, mode=Mode.PRIVATE)
    fillet1_piece_26b = split(fillet1_piece_26b, bisect_by=Plane(origin=(11.4, 0.255267344, 4.89933227), z_dir=(1, 0, 0)), keep=Keep.TOP, mode=Mode.PRIVATE)
    fillet1_piece_26 = fillet1_piece_26a & fillet1_piece_26b
    add(fillet1_piece_26, mode=Mode.SUBTRACT)


solid = part.part
